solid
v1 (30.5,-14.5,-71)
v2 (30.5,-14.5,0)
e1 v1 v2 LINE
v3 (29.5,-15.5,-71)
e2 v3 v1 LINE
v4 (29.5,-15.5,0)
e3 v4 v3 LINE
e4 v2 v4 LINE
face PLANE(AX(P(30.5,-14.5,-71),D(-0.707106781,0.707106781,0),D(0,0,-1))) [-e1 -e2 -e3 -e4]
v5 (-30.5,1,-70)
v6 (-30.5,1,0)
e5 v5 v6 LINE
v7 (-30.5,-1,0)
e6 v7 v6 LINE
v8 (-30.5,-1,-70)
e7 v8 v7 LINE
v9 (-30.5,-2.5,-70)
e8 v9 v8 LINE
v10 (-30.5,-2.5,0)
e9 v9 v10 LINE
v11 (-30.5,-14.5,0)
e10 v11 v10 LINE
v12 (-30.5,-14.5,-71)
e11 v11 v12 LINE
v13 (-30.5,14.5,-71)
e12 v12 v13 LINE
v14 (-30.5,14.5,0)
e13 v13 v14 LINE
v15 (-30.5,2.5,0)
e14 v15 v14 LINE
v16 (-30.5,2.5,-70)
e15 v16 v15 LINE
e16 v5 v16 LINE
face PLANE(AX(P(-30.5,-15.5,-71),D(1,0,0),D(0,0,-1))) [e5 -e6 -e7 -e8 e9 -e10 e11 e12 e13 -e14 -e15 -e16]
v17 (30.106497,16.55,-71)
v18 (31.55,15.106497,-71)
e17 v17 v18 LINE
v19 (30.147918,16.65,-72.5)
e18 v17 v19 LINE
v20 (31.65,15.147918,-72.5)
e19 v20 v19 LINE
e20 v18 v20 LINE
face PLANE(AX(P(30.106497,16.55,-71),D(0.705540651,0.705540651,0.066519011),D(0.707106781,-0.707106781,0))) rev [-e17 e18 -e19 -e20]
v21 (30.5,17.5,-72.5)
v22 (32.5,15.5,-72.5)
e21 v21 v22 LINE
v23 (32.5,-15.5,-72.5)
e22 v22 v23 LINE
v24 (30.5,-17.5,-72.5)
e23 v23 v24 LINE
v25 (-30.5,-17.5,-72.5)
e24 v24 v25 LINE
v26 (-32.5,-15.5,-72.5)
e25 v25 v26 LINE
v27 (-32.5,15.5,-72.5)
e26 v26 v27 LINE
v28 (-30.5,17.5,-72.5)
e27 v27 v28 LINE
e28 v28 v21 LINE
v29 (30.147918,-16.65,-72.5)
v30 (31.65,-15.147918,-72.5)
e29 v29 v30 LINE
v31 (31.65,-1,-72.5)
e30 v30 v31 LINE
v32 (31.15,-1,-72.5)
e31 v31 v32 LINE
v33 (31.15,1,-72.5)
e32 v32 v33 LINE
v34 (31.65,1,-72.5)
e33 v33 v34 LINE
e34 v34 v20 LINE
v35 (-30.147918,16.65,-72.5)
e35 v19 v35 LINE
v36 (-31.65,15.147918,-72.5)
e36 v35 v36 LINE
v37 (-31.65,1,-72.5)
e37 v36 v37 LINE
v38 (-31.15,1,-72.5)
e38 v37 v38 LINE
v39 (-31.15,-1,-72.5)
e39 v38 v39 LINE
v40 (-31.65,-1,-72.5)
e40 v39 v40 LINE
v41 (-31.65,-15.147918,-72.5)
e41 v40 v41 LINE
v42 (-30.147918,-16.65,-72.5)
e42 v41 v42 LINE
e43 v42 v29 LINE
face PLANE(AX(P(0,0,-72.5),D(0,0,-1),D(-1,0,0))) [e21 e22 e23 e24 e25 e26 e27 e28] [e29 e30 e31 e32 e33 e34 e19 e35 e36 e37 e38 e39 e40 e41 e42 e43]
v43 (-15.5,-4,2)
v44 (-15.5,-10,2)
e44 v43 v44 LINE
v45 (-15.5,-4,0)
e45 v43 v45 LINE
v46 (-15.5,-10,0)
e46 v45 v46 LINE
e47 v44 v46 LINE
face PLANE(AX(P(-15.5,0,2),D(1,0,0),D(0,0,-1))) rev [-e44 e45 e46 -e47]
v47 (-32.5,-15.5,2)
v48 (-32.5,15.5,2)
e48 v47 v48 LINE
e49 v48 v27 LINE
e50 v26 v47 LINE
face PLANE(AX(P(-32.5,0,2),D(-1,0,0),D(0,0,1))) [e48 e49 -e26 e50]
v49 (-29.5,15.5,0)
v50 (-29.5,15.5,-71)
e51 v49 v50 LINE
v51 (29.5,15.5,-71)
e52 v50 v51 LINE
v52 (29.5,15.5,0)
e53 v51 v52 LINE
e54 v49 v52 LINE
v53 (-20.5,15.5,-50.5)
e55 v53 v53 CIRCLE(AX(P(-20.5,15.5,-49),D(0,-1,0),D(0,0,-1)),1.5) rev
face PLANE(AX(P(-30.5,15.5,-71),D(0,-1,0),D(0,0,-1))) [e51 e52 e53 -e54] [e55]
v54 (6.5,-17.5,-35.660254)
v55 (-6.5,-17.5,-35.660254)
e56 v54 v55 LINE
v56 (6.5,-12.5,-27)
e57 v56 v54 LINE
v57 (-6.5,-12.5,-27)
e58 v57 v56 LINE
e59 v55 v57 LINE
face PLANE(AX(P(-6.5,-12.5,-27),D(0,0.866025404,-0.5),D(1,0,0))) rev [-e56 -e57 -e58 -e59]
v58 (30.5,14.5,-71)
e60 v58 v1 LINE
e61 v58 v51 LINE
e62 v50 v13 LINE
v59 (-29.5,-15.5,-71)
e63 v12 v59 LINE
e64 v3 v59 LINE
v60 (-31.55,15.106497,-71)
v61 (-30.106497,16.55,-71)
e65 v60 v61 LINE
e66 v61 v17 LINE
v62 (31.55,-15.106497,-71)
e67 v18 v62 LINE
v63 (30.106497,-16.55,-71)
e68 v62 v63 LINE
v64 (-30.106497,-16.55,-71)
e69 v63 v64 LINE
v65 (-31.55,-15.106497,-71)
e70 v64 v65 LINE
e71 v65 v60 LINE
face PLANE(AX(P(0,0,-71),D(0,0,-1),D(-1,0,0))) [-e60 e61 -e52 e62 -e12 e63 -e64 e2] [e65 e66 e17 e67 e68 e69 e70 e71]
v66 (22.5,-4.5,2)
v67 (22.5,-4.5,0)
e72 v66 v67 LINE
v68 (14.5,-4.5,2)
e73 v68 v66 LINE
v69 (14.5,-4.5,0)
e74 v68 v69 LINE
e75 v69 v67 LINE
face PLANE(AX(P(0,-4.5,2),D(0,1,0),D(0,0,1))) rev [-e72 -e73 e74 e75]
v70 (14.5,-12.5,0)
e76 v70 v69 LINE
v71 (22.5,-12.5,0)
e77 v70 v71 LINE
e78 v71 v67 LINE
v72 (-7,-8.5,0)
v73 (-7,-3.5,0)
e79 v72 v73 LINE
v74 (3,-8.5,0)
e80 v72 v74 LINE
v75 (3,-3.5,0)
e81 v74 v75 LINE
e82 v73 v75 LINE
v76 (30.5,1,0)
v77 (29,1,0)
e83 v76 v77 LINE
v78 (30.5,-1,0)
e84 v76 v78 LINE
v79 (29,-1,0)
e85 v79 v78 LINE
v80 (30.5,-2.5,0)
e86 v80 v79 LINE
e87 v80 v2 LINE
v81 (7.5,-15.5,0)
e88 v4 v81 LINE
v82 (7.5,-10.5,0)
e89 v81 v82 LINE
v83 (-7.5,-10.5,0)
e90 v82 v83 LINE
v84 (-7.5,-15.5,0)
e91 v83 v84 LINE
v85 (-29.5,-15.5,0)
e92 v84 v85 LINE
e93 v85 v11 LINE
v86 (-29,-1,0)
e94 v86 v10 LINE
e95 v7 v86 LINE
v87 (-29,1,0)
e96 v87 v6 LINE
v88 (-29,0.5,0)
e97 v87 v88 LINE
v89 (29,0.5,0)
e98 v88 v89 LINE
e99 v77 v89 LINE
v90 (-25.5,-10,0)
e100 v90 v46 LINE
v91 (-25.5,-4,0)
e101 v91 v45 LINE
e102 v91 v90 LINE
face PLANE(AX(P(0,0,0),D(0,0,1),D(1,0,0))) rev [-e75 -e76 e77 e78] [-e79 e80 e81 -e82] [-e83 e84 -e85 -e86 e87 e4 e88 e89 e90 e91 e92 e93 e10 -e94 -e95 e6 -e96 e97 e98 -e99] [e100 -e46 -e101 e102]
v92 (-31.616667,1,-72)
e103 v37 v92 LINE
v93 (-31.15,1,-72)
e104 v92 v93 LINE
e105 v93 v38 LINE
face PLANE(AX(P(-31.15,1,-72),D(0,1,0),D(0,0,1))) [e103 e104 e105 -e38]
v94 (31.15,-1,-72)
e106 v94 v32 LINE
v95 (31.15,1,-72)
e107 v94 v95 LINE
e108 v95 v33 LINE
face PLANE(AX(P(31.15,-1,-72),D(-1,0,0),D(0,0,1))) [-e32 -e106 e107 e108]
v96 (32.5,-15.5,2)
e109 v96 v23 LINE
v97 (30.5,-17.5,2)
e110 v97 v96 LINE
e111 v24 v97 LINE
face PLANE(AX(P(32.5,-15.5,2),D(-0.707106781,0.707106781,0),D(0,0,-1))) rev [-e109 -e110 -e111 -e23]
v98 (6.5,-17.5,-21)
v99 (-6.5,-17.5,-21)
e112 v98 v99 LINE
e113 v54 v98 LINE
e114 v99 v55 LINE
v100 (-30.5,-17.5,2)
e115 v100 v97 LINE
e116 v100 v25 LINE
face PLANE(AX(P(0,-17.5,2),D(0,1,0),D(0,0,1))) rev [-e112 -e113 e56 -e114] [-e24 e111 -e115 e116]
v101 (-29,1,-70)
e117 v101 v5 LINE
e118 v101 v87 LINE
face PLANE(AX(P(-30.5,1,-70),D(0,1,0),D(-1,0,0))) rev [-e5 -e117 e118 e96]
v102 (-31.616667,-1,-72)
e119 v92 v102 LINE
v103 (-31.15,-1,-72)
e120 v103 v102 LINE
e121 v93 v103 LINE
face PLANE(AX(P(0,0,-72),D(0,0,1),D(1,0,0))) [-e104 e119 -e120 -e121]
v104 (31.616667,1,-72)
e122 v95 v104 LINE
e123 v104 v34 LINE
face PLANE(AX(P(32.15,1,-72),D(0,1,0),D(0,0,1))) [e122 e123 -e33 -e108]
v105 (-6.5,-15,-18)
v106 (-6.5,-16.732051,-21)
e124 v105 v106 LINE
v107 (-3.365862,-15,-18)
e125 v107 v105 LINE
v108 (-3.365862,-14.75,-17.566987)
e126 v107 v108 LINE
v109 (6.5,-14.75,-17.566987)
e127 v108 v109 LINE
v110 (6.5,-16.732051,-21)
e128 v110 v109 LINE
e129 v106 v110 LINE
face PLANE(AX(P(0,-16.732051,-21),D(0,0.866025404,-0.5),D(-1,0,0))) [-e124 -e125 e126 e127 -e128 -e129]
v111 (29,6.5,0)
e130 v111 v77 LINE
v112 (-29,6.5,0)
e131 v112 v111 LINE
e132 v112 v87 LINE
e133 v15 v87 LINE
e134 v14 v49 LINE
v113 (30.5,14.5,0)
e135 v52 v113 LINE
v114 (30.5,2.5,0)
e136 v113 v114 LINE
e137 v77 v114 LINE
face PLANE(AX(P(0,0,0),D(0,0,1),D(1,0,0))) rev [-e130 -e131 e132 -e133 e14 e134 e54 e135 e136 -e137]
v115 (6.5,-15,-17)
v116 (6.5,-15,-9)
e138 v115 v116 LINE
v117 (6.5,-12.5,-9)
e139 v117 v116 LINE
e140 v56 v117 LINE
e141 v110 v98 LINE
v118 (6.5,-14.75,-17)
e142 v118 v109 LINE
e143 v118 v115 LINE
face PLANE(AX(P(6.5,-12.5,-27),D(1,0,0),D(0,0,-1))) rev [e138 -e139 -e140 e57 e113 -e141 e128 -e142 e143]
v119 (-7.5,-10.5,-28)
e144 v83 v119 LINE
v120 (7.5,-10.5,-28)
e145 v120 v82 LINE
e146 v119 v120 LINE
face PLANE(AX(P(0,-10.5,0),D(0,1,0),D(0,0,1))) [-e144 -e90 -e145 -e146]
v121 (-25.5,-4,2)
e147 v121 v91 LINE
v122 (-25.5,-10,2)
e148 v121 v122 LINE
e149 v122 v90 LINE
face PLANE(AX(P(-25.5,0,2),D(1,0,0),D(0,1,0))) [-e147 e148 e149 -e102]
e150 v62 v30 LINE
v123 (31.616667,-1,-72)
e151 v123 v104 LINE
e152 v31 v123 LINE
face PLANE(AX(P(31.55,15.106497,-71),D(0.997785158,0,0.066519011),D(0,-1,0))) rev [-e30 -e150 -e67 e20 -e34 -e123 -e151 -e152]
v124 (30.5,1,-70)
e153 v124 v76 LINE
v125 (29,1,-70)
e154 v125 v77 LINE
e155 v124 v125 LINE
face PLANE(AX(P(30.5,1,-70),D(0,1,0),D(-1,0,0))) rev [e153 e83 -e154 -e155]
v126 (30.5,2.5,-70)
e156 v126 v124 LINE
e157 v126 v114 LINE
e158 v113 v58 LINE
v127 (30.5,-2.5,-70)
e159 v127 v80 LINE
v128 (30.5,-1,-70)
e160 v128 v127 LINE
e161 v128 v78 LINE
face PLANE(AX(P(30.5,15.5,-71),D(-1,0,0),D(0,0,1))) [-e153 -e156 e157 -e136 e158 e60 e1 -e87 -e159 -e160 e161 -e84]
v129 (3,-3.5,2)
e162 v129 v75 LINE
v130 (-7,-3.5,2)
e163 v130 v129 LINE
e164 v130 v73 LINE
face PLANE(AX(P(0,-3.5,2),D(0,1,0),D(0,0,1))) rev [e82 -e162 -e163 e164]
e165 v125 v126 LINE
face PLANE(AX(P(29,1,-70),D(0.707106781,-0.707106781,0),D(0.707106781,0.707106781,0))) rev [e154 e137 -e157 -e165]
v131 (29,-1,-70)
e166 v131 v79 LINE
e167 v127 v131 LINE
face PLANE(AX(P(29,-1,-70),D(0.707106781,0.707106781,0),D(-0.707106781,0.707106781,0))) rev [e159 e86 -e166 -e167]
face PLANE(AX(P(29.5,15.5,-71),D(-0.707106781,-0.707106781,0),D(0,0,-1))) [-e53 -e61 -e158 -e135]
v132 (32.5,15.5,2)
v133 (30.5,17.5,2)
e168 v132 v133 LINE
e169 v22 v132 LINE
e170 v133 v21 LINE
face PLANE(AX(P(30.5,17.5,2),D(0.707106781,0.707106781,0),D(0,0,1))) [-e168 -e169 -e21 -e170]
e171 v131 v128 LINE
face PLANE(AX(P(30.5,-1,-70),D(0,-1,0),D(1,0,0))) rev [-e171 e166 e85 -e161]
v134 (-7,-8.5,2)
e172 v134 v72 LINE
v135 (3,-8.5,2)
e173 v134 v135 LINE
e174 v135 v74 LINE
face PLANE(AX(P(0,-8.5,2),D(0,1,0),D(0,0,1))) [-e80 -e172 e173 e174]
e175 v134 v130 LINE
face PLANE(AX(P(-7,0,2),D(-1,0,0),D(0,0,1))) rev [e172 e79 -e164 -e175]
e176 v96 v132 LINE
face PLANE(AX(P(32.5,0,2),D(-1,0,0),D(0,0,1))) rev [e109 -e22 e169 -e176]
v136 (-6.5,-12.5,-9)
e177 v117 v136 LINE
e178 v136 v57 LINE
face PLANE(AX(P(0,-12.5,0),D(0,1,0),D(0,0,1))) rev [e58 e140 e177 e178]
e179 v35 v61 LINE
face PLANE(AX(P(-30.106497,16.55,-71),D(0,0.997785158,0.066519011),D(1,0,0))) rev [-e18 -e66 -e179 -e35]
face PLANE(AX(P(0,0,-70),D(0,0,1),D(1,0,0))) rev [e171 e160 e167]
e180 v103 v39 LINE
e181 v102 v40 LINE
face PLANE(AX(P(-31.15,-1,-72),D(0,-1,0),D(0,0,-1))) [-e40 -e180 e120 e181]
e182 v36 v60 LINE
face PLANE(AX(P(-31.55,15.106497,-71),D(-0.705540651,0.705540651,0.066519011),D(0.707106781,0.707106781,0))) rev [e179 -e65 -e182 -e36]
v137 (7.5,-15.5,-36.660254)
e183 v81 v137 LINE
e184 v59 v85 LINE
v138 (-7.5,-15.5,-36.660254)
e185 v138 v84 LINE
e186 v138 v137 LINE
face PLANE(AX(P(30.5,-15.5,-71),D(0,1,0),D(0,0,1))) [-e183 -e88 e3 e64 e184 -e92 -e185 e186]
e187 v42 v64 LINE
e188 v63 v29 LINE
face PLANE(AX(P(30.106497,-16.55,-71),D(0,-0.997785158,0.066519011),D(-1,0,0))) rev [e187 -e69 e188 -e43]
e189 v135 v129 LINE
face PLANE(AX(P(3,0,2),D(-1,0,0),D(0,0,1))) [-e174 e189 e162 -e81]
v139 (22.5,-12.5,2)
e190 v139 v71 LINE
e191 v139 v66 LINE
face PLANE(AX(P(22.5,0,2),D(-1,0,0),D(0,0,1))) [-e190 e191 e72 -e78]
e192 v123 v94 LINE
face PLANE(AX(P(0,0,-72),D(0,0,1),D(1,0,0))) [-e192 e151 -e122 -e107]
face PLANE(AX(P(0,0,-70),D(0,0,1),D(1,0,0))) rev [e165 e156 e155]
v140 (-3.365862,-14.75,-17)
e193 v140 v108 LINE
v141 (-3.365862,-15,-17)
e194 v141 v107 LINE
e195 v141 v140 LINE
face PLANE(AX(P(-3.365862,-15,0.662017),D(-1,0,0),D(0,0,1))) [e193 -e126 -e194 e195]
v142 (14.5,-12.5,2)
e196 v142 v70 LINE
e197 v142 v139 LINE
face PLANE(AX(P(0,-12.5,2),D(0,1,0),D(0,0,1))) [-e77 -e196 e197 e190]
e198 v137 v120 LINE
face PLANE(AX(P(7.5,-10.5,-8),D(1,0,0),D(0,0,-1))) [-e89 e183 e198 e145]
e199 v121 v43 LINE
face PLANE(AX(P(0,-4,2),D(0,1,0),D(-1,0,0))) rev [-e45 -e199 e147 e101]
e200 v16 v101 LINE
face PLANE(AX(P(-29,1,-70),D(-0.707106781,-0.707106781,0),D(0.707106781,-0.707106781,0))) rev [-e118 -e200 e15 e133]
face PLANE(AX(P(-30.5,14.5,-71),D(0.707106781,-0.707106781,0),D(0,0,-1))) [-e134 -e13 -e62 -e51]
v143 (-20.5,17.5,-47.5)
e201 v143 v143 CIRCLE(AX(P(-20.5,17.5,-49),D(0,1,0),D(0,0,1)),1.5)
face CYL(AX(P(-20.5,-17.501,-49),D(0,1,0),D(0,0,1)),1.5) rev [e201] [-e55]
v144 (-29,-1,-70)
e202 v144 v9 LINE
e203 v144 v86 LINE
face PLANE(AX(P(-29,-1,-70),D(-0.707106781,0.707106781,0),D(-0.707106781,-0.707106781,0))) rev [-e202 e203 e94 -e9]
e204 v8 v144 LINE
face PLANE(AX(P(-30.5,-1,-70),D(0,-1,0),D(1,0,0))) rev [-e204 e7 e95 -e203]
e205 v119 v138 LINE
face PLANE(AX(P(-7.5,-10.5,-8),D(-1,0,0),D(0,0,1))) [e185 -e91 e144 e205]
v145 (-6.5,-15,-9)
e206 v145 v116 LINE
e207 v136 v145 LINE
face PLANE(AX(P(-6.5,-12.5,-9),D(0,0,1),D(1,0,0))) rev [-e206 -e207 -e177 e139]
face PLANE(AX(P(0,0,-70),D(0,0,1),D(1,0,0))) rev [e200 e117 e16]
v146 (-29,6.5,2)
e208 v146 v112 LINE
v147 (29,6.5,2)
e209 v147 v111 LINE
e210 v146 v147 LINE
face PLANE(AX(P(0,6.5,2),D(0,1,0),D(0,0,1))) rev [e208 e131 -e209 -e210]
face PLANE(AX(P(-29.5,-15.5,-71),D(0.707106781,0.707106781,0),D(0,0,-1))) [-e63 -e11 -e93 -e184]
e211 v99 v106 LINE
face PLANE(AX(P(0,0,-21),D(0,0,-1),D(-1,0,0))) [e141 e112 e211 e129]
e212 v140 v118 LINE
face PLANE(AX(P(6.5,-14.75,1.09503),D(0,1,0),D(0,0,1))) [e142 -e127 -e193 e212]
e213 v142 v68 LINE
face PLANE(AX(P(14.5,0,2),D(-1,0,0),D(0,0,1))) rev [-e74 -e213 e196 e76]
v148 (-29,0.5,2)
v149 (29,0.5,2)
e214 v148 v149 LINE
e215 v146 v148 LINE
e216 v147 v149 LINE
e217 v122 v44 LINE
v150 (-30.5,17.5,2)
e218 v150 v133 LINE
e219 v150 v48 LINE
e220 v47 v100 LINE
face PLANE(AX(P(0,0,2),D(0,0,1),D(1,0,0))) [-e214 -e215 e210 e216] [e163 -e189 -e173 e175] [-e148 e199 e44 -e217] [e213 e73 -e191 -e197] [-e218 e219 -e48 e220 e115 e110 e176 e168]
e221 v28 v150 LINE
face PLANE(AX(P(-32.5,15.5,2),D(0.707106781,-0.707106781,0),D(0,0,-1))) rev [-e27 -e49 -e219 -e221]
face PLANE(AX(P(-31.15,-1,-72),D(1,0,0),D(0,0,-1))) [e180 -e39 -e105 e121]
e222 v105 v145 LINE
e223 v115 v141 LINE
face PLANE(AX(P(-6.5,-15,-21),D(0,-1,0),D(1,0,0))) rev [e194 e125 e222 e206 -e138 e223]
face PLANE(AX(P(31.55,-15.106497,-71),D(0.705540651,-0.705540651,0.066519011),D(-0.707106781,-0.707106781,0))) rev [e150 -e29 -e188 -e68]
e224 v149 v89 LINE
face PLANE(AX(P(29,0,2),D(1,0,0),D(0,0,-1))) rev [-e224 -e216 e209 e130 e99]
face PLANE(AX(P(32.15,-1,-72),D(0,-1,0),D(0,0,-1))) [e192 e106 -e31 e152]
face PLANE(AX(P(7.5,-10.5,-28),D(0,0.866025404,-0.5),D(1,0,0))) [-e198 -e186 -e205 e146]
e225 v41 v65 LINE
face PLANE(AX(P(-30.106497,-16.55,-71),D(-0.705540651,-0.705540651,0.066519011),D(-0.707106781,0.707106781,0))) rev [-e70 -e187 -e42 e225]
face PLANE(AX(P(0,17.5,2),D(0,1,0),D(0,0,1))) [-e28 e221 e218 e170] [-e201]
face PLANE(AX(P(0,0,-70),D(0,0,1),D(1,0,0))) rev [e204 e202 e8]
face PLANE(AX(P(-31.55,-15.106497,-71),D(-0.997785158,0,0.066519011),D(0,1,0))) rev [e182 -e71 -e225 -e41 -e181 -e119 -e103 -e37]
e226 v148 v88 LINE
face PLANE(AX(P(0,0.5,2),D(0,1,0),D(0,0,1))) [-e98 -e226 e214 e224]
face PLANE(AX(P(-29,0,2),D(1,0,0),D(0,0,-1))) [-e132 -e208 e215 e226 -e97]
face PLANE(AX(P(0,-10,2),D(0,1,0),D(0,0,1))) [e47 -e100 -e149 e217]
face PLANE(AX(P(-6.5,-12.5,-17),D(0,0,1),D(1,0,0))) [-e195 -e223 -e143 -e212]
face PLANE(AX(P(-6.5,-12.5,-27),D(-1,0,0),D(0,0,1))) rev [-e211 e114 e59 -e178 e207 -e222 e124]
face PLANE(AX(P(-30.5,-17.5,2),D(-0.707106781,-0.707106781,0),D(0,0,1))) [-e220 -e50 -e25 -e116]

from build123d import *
from OCP.BRepFilletAPI import BRepFilletAPI_MakeChamfer

# Parameters (mm, degrees)
CROQUIS1_W              = 3.5
CROQUIS1_H              = 6
CROQUIS1_W_2            = 10
CROQUIS1_H_2            = 5
CROQUIS1_W_3            = 8
CROQUIS1_H_3            = 8
SALIENTE_EXTRUIR1_DEPTH = 2
CROQUIS2_W              = 65
CROQUIS2_H              = 35
CROQUIS2_W_2            = 61
CROQUIS2_H_2            = 31
SALIENTE_EXTRUIR2_DEPTH = 71
SALIENTE_EXTRUIR3_DEPTH = 70
CORTAR_EXTRUIR2_REACH   = 87.57
CROQUIS9_R              = 1.5
CHAFL_N3_SIZE           = 2
CHAFL_N2_SIZE           = 1
BOSS_EXTRUDE1_DEPTH     = 1.5
CHAMFER1_SIZE           = 0.1
CHAMFER1_SIZE_2         = 1.5
SKETCH2_W               = 1
SKETCH2_H               = 2
BOSS_EXTRUDE2_DEPTH     = 0.5
SKETCH3_W               = 15
SKETCH3_H               = 20
BOSS_EXTRUDE3_DEPTH     = 7
SKETCH4_W               = 13
SKETCH4_H               = 18
CUT_EXTRUDE1_DEPTH      = 5
SKETCH5_W               = 13
SKETCH5_H               = 2.5
BOSS_EXTRUDE4_DEPTH     = 12
CHAMFER2_SIZE2          = 5
CHAMFER2_SIZE           = 8.660254038
CHAMFER3_SIZE2          = 5
CHAMFER3_SIZE           = 8.660254038
CHAMFER4_SIZE           = 3
CHAMFER4_SIZE2          = 1.732050808
BOSS_EXTRUDE5_REACH     = 76.315
SKETCH6_W               = 15
SKETCH6_H               = 5
BOSS_EXTRUDE6_REACH     = 171.868
SKETCH7_W               = 9.865861754
SKETCH7_H               = 0.5


with BuildPart() as part:
    # Croquis1 → Saliente-Extruir1 (new body)
    # profile 1 of 4: a face of its own
    with BuildSketch(Plane.XY):
        Polygon((-32.5, 6.5), (-29, 6.5), (29, 6.5), (32.5, 6.5), (32.5, 17.5), (-32.5, 17.5), align=None)
    # profile 2 of 4: a face of its own
    with BuildSketch(Plane.XY):
        with Locations((-30.75, 3.5)):
            Rectangle(CROQUIS1_W, CROQUIS1_H)
    # profile 3 of 4: a face of its own
    with BuildSketch(Plane.XY):
        with Locations((30.75, 3.5)):
            Rectangle(CROQUIS1_W, CROQUIS1_H)
    # profile 4 of 4: a face of its own
    with BuildSketch(Plane.XY):
        Polygon((29, 0.5), (-29, 0.5), (-32.5, 0.5), (-32.5, -17.5), (32.5, -17.5), (32.5, 0.5), align=None)
        with Locations((-20.5, -7)):
            Rectangle(CROQUIS1_W_2, CROQUIS1_H, mode=Mode.SUBTRACT)
        with Locations((-2, -6)):
            Rectangle(CROQUIS1_W_2, CROQUIS1_H_2, mode=Mode.SUBTRACT)
        with Locations((18.5, -8.5)):
            Rectangle(CROQUIS1_W_3, CROQUIS1_H_3, mode=Mode.SUBTRACT)
    extrude(amount=SALIENTE_EXTRUIR1_DEPTH)

    # Croquis2 → Saliente-Extruir2 (add)
    with BuildSketch(Plane(origin=(0, 0, 0), x_dir=(-1, 0, 0), z_dir=(0, 0, -1))):
        Rectangle(CROQUIS2_W, CROQUIS2_H)
        Rectangle(CROQUIS2_W_2, CROQUIS2_H_2, mode=Mode.SUBTRACT)
    extrude(amount=SALIENTE_EXTRUIR2_DEPTH)

    # Croquis3 → Saliente-Extruir3 (add)
    with BuildSketch(Plane(origin=(0, 0, 0), x_dir=(-1, 0, 0), z_dir=(0, 0, -1))):
        Polygon((-30.5, 1), (-29, 1), (-30.5, 2.5), align=None)
        Polygon((-30.5, -1), (-30.5, -2.5), (-29, -1), align=None)
        Polygon((30.5, -1), (29, -1), (30.5, -2.5), align=None)
        Polygon((30.5, 1), (30.5, 2.5), (29, 1), align=None)
    extrude(amount=SALIENTE_EXTRUIR3_DEPTH)

    # Croquis9 → Cortar-Extruir2 (cut, up to next)
    with BuildSketch(Plane(origin=(0, 17.5, 0), x_dir=(1, 0, 0), z_dir=(0, 1, 0)), mode=Mode.PRIVATE) as cortar_extruir2_sk1:
        with Locations(Location((-20.5, 49, 0), (0, 0, 270))):
            Circle(CROQUIS9_R)
    cortar_extruir2_tool1 = extrude(cortar_extruir2_sk1.sketch, amount=-CORTAR_EXTRUIR2_REACH, mode=Mode.PRIVATE) & part.part
    add(cortar_extruir2_tool1.solids().sort_by_distance((-20.5, 17.5, -49))[0], mode=Mode.SUBTRACT)

    # Chaflán3
    chafl_n3_edges = [part.edges().sort_by_distance(p)[0] for p in [
        (-32.5, -17.5, -34.5),
        (-32.5, 17.5, -34.5),
        (32.5, 17.5, -34.5),
        (32.5, -17.5, -34.5),
    ]]
    chamfer(chafl_n3_edges, length=CHAFL_N3_SIZE)

    # Chaflán2
    chafl_n2_edges = [part.edges().sort_by_distance(p)[0] for p in [
        (-30.5, 15.5, -35.5),
        (30.5, 15.5, -35.5),
        (30.5, -15.5, -35.5),
        (-30.5, -15.5, -35.5),
    ]]
    chamfer(chafl_n2_edges, length=CHAFL_N2_SIZE)

    # Sketch1 → Boss-Extrude1 (add)
    with BuildSketch(Plane(origin=(0, 0, -71), x_dir=(-1, 0, 0), z_dir=(0, 0, -1))):
        Polygon((-32.5, 15.5), (-32.5, -15.5), (-30.5, -17.5), (30.5, -17.5), (32.5, -15.5), (32.5, 15.5), (30.5, 17.5), (-30.5, 17.5), align=None)
        Polygon((-31.55, 15.106497116), (-31.55, -15.106497116), (-30.106497116, -16.55), (30.106497116, -16.55), (31.55, -15.106497116), (31.55, 15.106497116), (30.106497116, 16.55), (-30.106497116, 16.55), align=None, mode=Mode.SUBTRACT)
    extrude(amount=BOSS_EXTRUDE1_DEPTH)

    # Chamfer1
    chamfer1_edges_1 = [part.edges().sort_by_distance(p)[0] for p in [
        (0, -16.55, -72.5),
    ]]
    chamfer1_side_1 = [part.faces().sort_by_distance(p)[0] for p in [
        (0, -16.552, -72.5),
    ]]
    chamfer1_edges_2 = [part.edges().sort_by_distance(p)[0] for p in [
        (-30.828248558, -15.828248558, -72.5),
    ]]
    chamfer1_side_2 = [part.faces().sort_by_distance(p)[0] for p in [
        (-30.829662771, -15.829662771, -72.5),
    ]]
    chamfer1_edges_3 = [part.edges().sort_by_distance(p)[0] for p in [
        (-31.55, 0, -72.5),
    ]]
    chamfer1_side_3 = [part.faces().sort_by_distance(p)[0] for p in [
        (-31.552, 0, -72.5),
    ]]
    chamfer1_edges_4 = [part.edges().sort_by_distance(p)[0] for p in [
        (-30.828248558, 15.828248558, -72.5),
    ]]
    chamfer1_side_4 = [part.faces().sort_by_distance(p)[0] for p in [
        (-30.829662771, 15.829662771, -72.5),
    ]]
    chamfer1_edges_5 = [part.edges().sort_by_distance(p)[0] for p in [
        (0, 16.55, -72.5),
    ]]
    chamfer1_side_5 = [part.faces().sort_by_distance(p)[0] for p in [
        (0, 16.552, -72.5),
    ]]
    chamfer1_edges_6 = [part.edges().sort_by_distance(p)[0] for p in [
        (30.828248558, 15.828248558, -72.5),
    ]]
    chamfer1_side_6 = [part.faces().sort_by_distance(p)[0] for p in [
        (30.829662771, 15.829662771, -72.5),
    ]]
    chamfer1_edges_7 = [part.edges().sort_by_distance(p)[0] for p in [
        (31.55, 0, -72.5),
    ]]
    chamfer1_side_7 = [part.faces().sort_by_distance(p)[0] for p in [
        (31.552, 0, -72.5),
    ]]
    chamfer1_edges_8 = [part.edges().sort_by_distance(p)[0] for p in [
        (30.828248558, -15.828248558, -72.5),
    ]]
    chamfer1_side_8 = [part.faces().sort_by_distance(p)[0] for p in [
        (30.829662771, -15.829662771, -72.5),
    ]]
    chamfer1 = BRepFilletAPI_MakeChamfer(part.part.solid().wrapped)
    for e in chamfer1_edges_1:
        chamfer1.Add(CHAMFER1_SIZE - 0.0001, CHAMFER1_SIZE_2 - 0.0001, e.wrapped, chamfer1_side_1[0].wrapped)
    for e in chamfer1_edges_2:
        chamfer1.Add(CHAMFER1_SIZE - 0.0001, CHAMFER1_SIZE_2 - 0.0001, e.wrapped, chamfer1_side_2[0].wrapped)
    for e in chamfer1_edges_3:
        chamfer1.Add(CHAMFER1_SIZE - 0.0001, CHAMFER1_SIZE_2 - 0.0001, e.wrapped, chamfer1_side_3[0].wrapped)
    for e in chamfer1_edges_4:
        chamfer1.Add(CHAMFER1_SIZE - 0.0001, CHAMFER1_SIZE_2 - 0.0001, e.wrapped, chamfer1_side_4[0].wrapped)
    for e in chamfer1_edges_5:
        chamfer1.Add(CHAMFER1_SIZE - 0.0001, CHAMFER1_SIZE_2 - 0.0001, e.wrapped, chamfer1_side_5[0].wrapped)
    for e in chamfer1_edges_6:
        chamfer1.Add(CHAMFER1_SIZE - 0.0001, CHAMFER1_SIZE_2 - 0.0001, e.wrapped, chamfer1_side_6[0].wrapped)
    for e in chamfer1_edges_7:
        chamfer1.Add(CHAMFER1_SIZE - 0.0001, CHAMFER1_SIZE_2 - 0.0001, e.wrapped, chamfer1_side_7[0].wrapped)
    for e in chamfer1_edges_8:
        chamfer1.Add(CHAMFER1_SIZE - 0.0001, CHAMFER1_SIZE_2 - 0.0001, e.wrapped, chamfer1_side_8[0].wrapped)
    add(Compound.cast(chamfer1.Shape()), mode=Mode.REPLACE)  # a hair under: the kernel refuses the full size

    # Sketch2 → Boss-Extrude2 (add)
    with BuildSketch(Plane(origin=(0, 0, -72.5), x_dir=(-1, 0, 0), z_dir=(0, 0, -1))):
        with Locations((-31.65, 0)):
            Rectangle(SKETCH2_W, SKETCH2_H)
        with Locations((31.65, 0)):
            Rectangle(SKETCH2_W, SKETCH2_H)
    extrude(amount=-BOSS_EXTRUDE2_DEPTH)

    # Sketch3 → Boss-Extrude3 (add)
    with BuildSketch(Plane.XZ.offset(17.5)):
        with Locations((0, -18)):
            Rectangle(SKETCH3_W, SKETCH3_H)
    extrude(amount=-BOSS_EXTRUDE3_DEPTH)

    # Sketch4 → Cut-Extrude1 (cut)
    with BuildSketch(Plane.XZ.offset(17.5)):
        with Locations((0, -18)):
            Rectangle(SKETCH4_W, SKETCH4_H)
    extrude(amount=-CUT_EXTRUDE1_DEPTH, mode=Mode.SUBTRACT)

    # Sketch5 → Boss-Extrude4 (add)
    with BuildSketch(Plane(origin=(0, 0, -9), x_dir=(-1, 0, 0), z_dir=(0, 0, -1))):
        with Locations((0, -16.25)):
            Rectangle(SKETCH5_W, SKETCH5_H)
    extrude(amount=BOSS_EXTRUDE4_DEPTH)

    # Chamfer2
    chamfer2_edges = [part.edges().sort_by_distance(p)[0] for p in [
        (0, -15.5, -28),
    ]]
    chamfer2_side = [part.faces().sort_by_distance(p)[0] for p in [
        (0, -15.5, -28.1),
    ]]
    chamfer(chamfer2_edges, length=CHAMFER2_SIZE - 0.0001, length2=CHAMFER2_SIZE2 - 0.0001, reference=chamfer2_side[0])  # a hair under: the kernel refuses the full size

    # Chamfer3
    chamfer3_edges = [part.edges().sort_by_distance(p)[0] for p in [
        (0, -17.5, -27),
    ]]
    chamfer3_side = [part.faces().sort_by_distance(p)[0] for p in [
        (0, -17.5, -27.1),
    ]]
    chamfer(chamfer3_edges, length=CHAMFER3_SIZE - 0.0001, length2=CHAMFER3_SIZE2 - 0.0001, reference=chamfer3_side[0])  # a hair under: the kernel refuses the full size

    # Chamfer4
    chamfer4_edges = [part.edges().sort_by_distance(p)[0] for p in [
        (0, -15, -21),
    ]]
    chamfer4_side = [part.faces().sort_by_distance(p)[0] for p in [
        (0, -15, -15),
    ]]
    chamfer(chamfer4_edges, length=CHAMFER4_SIZE, length2=CHAMFER4_SIZE2, reference=chamfer4_side[0])

    # Sketch6 → Boss-Extrude5 (add, up to next)
    with BuildSketch(Plane.XY.offset(-8), mode=Mode.PRIVATE) as boss_extrude5_sk1:
        with Locations((0, -13)):
            Rectangle(SKETCH6_W, SKETCH6_H)
    boss_extrude5_tool1 = extrude(boss_extrude5_sk1.sketch, amount=BOSS_EXTRUDE5_REACH, mode=Mode.PRIVATE) - part.part
    add(boss_extrude5_tool1.solids().sort_by_distance((0, -13, -8))[0])

    # Boss-Extrude6: up to this plane
    boss_extrude6_end = Plane(origin=(-6.5, -12.5, -17), z_dir=(0, 0, 1))
    # Sketch7 → Boss-Extrude6 (add, up to the surface)
    with BuildSketch(Plane(origin=(0, -3.455771366, 1.995190528), x_dir=(1, 0, 0), z_dir=(0, 0.8660254037844395, -0.4999999999999988)), mode=Mode.PRIVATE) as boss_extrude6_sk1:
        with Locations((1.567069123, 22.838457268)):
            Rectangle(SKETCH7_W, SKETCH7_H)
    boss_extrude6_tool1 = split(extrude(boss_extrude6_sk1.sketch, amount=BOSS_EXTRUDE6_REACH, dir=(0, 0, 1), mode=Mode.PRIVATE), bisect_by=boss_extrude6_end, keep=Keep.BOTH, mode=Mode.PRIVATE)
    add(boss_extrude6_tool1.solids().sort_by_distance((1.567069, -14.875, -17.783494))[0])


solid = part.part
